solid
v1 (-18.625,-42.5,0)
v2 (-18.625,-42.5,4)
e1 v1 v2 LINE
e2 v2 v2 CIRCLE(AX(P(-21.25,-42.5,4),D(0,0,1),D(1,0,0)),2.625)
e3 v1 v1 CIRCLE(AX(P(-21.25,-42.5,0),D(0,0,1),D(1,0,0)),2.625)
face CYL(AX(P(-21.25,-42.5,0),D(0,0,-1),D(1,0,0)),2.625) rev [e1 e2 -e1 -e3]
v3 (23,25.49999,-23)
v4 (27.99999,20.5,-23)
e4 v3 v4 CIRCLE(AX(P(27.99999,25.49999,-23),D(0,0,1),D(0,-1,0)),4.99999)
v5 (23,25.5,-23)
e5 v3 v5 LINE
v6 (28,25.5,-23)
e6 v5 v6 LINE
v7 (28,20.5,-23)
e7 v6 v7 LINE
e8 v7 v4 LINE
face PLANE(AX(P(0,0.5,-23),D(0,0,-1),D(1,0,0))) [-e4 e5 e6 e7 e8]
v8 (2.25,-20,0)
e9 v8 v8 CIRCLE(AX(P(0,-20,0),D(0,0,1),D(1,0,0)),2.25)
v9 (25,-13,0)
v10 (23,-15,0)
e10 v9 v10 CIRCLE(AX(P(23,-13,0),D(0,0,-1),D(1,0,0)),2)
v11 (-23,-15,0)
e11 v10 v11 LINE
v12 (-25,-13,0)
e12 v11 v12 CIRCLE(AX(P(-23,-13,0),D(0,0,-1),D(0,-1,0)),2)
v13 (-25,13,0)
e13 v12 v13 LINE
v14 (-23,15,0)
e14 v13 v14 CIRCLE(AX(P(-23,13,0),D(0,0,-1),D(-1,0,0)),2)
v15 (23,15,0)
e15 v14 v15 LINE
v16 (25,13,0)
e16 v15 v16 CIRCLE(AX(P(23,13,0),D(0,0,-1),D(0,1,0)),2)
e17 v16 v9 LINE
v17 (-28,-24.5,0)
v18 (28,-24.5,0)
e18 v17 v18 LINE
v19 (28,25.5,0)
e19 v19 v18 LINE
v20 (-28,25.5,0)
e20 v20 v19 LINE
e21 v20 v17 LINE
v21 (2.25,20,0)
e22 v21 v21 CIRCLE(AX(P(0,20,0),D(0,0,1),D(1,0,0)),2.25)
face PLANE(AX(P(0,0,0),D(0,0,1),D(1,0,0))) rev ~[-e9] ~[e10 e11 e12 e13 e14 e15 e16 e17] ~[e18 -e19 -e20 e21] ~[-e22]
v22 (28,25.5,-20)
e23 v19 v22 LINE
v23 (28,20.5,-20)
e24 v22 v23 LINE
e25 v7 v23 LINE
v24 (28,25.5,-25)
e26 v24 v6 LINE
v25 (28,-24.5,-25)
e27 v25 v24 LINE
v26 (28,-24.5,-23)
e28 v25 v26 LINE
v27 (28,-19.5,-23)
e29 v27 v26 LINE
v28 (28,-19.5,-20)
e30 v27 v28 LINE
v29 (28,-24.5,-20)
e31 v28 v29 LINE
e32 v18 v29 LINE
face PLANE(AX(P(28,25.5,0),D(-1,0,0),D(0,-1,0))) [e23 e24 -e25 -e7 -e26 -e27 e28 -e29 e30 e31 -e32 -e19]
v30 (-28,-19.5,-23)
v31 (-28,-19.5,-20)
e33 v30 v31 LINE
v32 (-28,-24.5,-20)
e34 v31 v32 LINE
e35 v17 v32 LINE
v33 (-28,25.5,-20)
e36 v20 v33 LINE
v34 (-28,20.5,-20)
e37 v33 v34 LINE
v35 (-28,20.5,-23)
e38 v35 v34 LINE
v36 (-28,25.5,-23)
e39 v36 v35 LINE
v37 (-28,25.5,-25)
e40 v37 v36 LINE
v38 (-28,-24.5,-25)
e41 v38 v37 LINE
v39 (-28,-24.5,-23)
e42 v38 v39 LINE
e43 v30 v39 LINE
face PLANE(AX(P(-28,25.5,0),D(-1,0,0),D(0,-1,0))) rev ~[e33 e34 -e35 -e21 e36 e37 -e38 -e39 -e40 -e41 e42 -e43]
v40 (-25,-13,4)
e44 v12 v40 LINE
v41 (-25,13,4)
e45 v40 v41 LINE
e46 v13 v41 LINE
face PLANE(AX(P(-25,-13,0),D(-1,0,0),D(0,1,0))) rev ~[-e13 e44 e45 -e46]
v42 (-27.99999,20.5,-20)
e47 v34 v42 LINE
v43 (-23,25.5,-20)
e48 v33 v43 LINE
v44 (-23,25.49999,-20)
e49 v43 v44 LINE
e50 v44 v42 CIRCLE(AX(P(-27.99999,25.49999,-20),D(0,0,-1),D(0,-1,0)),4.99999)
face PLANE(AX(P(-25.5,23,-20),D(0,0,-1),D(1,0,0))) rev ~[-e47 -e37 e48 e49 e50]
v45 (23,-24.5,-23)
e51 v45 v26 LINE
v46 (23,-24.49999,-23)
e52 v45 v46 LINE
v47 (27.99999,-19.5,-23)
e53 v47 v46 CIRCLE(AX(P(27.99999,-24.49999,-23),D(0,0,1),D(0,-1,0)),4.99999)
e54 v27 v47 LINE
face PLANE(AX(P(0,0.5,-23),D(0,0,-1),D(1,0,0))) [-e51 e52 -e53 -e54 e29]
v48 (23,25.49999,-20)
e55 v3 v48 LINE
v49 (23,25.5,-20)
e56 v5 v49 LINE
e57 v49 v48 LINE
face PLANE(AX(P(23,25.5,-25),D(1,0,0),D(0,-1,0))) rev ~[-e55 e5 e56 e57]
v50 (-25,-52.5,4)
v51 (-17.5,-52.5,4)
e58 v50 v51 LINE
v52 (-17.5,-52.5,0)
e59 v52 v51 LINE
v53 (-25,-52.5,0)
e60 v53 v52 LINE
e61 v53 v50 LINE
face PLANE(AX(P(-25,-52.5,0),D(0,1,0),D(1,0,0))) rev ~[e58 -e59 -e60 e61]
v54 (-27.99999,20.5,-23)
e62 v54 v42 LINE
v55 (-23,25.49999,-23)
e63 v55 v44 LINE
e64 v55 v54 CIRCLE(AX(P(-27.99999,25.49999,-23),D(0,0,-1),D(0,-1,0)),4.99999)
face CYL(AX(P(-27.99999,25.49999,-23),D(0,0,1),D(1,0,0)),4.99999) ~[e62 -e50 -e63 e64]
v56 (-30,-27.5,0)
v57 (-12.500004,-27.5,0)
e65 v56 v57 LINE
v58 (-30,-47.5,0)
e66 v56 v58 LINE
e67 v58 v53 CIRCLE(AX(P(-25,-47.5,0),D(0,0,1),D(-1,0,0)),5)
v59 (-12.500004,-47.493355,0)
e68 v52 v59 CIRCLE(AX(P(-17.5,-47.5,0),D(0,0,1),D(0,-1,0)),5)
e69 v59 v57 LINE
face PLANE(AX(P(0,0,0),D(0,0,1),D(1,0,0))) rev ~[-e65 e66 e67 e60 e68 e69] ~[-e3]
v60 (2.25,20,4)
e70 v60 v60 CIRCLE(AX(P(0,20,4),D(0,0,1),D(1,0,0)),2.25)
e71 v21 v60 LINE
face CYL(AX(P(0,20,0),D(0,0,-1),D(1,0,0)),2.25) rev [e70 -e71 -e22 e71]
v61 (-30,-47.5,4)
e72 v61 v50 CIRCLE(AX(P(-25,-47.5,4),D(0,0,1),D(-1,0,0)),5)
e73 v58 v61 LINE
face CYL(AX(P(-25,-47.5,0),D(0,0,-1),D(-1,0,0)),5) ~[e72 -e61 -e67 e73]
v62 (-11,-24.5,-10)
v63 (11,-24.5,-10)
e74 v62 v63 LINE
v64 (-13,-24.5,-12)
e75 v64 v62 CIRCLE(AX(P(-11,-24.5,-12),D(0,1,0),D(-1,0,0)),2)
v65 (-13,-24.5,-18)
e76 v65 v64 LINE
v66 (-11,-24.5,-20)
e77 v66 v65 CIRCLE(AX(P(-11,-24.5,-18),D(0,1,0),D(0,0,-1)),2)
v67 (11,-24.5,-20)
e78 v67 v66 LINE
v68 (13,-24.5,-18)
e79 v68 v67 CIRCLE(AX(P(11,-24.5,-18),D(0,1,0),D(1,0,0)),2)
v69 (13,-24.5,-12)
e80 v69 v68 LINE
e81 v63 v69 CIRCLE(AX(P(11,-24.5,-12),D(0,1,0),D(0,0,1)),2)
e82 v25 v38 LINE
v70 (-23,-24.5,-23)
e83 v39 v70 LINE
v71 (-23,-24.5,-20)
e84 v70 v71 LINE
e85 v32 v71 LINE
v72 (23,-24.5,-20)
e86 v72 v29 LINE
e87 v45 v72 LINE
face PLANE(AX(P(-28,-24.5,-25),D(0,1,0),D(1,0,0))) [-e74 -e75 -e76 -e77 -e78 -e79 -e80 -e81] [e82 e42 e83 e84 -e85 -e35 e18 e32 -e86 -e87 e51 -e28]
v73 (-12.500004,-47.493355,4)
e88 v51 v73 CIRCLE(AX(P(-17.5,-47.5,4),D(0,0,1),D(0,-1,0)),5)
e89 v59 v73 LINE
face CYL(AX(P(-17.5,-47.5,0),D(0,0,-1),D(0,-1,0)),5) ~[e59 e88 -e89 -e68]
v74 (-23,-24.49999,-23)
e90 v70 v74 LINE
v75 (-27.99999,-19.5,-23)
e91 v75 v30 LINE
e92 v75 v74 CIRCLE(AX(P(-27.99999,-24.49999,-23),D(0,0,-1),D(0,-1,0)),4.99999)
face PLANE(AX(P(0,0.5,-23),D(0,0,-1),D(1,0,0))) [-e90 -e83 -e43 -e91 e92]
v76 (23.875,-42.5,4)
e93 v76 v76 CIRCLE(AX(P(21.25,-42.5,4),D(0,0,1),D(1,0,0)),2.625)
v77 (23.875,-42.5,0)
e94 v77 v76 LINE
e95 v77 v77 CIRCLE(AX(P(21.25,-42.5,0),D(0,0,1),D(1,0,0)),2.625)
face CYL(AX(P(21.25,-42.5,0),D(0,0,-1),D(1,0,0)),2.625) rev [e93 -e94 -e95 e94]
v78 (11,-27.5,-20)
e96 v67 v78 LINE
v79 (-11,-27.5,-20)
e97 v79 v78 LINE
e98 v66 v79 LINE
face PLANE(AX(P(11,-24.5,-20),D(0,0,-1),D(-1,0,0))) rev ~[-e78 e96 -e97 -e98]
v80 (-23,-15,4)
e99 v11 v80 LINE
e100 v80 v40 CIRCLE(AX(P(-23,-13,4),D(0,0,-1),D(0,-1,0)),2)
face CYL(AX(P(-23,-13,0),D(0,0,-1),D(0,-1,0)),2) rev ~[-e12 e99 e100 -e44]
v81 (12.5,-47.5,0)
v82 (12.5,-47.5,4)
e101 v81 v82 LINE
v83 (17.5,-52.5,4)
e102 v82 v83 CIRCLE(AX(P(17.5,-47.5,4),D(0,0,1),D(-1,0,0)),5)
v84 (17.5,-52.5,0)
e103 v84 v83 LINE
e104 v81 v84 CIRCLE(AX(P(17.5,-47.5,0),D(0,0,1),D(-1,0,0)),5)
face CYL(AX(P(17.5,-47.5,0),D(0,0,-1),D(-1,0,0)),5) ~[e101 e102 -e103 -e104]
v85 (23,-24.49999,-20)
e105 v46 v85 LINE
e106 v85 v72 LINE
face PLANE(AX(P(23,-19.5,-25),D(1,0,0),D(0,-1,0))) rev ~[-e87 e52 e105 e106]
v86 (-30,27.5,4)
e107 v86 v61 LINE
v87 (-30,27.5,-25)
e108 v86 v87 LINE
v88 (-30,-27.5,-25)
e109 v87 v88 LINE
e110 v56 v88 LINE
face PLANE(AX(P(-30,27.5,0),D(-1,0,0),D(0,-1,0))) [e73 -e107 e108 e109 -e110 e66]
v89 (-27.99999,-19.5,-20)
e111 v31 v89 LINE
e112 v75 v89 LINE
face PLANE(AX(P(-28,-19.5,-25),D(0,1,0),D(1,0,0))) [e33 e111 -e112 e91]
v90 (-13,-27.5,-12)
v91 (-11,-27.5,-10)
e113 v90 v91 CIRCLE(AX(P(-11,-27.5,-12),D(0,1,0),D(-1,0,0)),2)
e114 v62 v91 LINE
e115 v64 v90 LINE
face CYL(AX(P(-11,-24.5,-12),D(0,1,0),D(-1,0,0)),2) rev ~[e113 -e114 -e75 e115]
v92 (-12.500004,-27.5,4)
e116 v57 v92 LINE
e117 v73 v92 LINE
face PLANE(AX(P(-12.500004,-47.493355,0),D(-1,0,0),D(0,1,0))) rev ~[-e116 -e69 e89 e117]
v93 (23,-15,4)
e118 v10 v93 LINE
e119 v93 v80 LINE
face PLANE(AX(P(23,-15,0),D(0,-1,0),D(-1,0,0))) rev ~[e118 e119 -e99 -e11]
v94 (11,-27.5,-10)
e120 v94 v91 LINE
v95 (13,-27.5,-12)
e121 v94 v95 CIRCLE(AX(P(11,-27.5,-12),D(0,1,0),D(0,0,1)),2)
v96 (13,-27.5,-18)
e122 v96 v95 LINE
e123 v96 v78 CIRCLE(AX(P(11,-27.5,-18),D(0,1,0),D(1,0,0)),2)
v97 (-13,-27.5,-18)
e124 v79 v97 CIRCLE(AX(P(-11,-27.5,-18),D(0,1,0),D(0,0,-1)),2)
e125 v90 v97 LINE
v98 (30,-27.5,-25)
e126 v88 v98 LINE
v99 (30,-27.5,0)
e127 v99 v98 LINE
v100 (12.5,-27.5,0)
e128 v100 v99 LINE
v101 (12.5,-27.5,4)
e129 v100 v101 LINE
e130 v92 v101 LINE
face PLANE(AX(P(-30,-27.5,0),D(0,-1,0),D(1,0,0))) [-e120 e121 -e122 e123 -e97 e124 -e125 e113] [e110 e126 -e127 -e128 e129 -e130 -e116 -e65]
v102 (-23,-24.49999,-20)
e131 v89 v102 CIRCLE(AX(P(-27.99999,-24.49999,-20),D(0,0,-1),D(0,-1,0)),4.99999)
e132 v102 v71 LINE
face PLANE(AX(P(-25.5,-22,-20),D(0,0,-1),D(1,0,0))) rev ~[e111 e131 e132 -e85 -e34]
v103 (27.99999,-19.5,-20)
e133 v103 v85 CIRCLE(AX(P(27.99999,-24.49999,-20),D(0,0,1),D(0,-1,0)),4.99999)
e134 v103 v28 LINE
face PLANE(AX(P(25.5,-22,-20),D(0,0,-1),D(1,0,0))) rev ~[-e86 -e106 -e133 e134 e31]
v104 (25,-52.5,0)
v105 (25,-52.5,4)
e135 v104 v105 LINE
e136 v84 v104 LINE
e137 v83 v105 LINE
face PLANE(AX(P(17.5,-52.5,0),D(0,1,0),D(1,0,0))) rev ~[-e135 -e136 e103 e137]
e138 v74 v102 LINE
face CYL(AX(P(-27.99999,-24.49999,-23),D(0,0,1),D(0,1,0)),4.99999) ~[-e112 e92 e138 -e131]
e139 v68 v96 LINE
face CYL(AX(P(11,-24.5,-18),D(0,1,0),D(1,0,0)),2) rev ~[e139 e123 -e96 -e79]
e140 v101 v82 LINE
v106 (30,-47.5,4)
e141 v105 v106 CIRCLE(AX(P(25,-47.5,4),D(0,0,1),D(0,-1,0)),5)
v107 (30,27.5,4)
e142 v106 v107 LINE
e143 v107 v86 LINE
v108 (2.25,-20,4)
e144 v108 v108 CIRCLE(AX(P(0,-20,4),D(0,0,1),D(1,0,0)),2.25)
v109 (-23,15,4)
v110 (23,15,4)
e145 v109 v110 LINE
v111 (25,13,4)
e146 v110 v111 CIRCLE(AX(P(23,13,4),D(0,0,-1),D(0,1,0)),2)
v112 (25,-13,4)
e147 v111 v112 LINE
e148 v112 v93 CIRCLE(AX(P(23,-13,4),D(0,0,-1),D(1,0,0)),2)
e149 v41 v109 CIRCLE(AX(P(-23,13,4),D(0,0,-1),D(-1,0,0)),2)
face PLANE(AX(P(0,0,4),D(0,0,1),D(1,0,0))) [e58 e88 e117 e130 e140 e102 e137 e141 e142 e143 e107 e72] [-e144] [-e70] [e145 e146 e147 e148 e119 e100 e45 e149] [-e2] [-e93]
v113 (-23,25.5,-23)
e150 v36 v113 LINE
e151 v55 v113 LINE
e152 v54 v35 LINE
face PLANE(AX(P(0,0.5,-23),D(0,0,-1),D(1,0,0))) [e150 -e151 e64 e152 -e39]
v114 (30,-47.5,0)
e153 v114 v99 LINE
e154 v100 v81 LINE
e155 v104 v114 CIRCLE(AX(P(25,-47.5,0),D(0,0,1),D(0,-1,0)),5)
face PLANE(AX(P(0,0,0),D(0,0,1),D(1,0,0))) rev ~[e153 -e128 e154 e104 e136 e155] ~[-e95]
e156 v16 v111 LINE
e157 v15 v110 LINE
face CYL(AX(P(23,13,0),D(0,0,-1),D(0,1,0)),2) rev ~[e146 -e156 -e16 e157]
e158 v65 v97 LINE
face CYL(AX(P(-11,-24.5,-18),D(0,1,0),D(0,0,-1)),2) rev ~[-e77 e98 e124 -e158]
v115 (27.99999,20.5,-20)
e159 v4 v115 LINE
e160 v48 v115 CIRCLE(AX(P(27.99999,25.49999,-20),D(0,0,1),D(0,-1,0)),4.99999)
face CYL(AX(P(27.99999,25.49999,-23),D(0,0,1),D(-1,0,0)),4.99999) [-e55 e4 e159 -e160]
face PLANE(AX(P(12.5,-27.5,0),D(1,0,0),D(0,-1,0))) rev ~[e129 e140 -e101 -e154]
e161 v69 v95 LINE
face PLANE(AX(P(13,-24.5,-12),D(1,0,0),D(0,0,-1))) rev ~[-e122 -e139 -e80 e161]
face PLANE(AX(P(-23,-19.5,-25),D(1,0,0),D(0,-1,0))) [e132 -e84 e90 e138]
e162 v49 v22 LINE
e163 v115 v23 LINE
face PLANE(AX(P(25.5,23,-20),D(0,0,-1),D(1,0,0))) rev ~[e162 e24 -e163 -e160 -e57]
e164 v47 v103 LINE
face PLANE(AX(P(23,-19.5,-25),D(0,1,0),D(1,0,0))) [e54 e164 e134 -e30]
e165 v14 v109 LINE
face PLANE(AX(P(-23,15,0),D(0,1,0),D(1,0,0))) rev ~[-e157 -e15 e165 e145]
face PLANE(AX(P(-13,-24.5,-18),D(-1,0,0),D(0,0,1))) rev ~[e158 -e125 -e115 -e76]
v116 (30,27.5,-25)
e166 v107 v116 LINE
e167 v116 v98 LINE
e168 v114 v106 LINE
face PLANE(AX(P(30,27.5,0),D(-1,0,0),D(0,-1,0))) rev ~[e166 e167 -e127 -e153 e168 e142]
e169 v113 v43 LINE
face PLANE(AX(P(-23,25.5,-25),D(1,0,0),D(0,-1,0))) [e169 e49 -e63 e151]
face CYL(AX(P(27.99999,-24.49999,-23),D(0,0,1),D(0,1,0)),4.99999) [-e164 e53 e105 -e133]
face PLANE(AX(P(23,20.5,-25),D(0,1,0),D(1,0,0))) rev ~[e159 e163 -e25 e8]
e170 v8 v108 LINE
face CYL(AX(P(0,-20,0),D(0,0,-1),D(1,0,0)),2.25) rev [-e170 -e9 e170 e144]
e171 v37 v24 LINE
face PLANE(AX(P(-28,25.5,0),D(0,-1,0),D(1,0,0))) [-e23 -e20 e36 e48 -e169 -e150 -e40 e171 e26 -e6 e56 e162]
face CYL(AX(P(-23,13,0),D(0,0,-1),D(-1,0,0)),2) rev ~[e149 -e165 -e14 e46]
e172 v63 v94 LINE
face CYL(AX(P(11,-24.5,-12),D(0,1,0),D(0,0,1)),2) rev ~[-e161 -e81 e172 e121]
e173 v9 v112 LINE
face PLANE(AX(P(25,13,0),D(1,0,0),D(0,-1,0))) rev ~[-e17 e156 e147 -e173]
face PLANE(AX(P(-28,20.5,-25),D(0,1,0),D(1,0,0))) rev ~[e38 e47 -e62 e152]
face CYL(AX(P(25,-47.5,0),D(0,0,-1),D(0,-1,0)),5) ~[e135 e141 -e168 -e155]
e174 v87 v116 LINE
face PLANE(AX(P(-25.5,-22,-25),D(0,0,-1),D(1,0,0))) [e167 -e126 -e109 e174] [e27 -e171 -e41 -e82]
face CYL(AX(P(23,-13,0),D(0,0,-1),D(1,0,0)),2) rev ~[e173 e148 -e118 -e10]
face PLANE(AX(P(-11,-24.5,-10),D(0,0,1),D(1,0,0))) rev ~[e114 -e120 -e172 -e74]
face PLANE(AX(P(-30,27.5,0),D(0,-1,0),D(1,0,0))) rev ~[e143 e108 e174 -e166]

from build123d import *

# Parameters (mm, degrees)
F0_R     = 2.25
F0_R_2   = 2.625
F1_DEPTH = 4
F2_W     = 60
F2_H     = 55
F2_W_2   = 56
F2_H_2   = 50
F3_DEPTH = 25
F5_DEPTH = 25
F6_W     = 5
F6_H     = 5
F7_DEPTH = 5
F8_W     = 56
F8_H     = 50
F9_DEPTH = 2
F10_R    = 4.99999


# Not quite as in the source:
# - a fillet or chamfer is up to 0.001 mm smaller than in the source, because OpenCascade refuses the exact size


with BuildPart() as f1:
    # F0 (on Top) → F1 (new body)
    with BuildSketch(Plane.XY):
        Polygon((30, 27.5), (-30, 27.5), (-30, -27.5), (-12.5000044162, -27.5), (12.5, -27.5), (30, -27.5), align=None)
        with Locations((0, -20)):
            Circle(F0_R, mode=Mode.SUBTRACT)
        with BuildLine():
            ThreePointArc((-25, 13), (-24.4142135624, 14.4142135624), (-23, 15))
            Line((-23, 15), (23, 15))
            ThreePointArc((23, 15), (24.4142135624, 14.4142135624), (25, 13))
            Line((25, 13), (25, -13))
            ThreePointArc((25, -13), (24.4142135624, -14.4142135624), (23, -15))
            Line((23, -15), (-23, -15))
            ThreePointArc((-23, -15), (-24.4142135624, -14.4142135624), (-25, -13))
            Line((-25, -13), (-25, 13))
        make_face(mode=Mode.SUBTRACT)
        with Locations((0, 20)):
            Circle(F0_R, mode=Mode.SUBTRACT)
        with BuildLine():
            Line((-12.5000044162, -27.5), (-30, -27.5))
            Line((-30, -27.5), (-30, -47.5))
            ThreePointArc((-30, -47.5), (-28.5355339059, -51.0355339059), (-25, -52.5))
            Line((-25, -52.5), (-17.5, -52.5))
            ThreePointArc((-17.5, -52.5), (-13.9621173589, -51.0331836094), (-12.5000044162, -47.4933545672))
            Line((-12.5000044162, -47.4933545672), (-12.5000044162, -27.5))
        make_face()
        with Locations((-21.25, -42.5)):
            Circle(F0_R_2, mode=Mode.SUBTRACT)
        with BuildLine():
            Line((30, -47.5), (30, -27.5))
            Line((30, -27.5), (12.5, -27.5))
            Line((12.5, -27.5), (12.5, -47.5))
            ThreePointArc((12.5, -47.5), (13.9644660941, -51.0355339059), (17.5, -52.5))
            Line((17.5, -52.5), (25, -52.5))
            ThreePointArc((25, -52.5), (28.5355339059, -51.0355339059), (30, -47.5))
        make_face()
        with Locations((21.25, -42.5)):
            Circle(F0_R_2, mode=Mode.SUBTRACT)
    extrude(amount=F1_DEPTH)

    # F2 (on face) → F3 (join)
    with BuildSketch(Plane(origin=(0, 0, 0), x_dir=(1, 0, 0), z_dir=(0, 0, -1))):
        Rectangle(F2_W, F2_H)
        with Locations((0, -0.5)):
            Rectangle(F2_W_2, F2_H_2, mode=Mode.SUBTRACT)
    extrude(amount=F3_DEPTH)

    # F4 (on face) → F5 (cut)
    with BuildSketch(Plane(origin=(0, -24.5, 0), x_dir=(-1, 0, 0), z_dir=(0, 1, 0))):
        with BuildLine():
            Line((11, -10), (-11, -10))
            ThreePointArc((-11, -10), (-12.4142135624, -10.5857864376), (-13, -12))
            Line((-13, -12), (-13, -18))
            ThreePointArc((-13, -18), (-12.4142135624, -19.4142135624), (-11, -20))
            Line((-11, -20), (11, -20))
            ThreePointArc((11, -20), (12.4142135624, -19.4142135624), (13, -18))
            Line((13, -18), (13, -12))
            ThreePointArc((13, -12), (12.4142135624, -10.5857864376), (11, -10))
        make_face()
    extrude(amount=-F5_DEPTH, mode=Mode.SUBTRACT)

    # F6 (on face) → F7 (join)
    with BuildSketch(Plane(origin=(0, 0, -25), x_dir=(1, 0, 0), z_dir=(0, 0, -1))):
        with Locations((-25.5, 22)):
            Rectangle(F6_W, F6_H)
        with Locations((25.5, 22)):
            Rectangle(F6_W, F6_H)
        with Locations((25.5, -23)):
            Rectangle(F6_W, F6_H)
        with Locations((-25.5, -23)):
            Rectangle(F6_W, F6_H)
    extrude(amount=-F7_DEPTH)

    # F8 (on face) → F9 (cut)
    with BuildSketch(Plane(origin=(0, 0, -25), x_dir=(1, 0, 0), z_dir=(0, 0, -1))):
        with Locations((0, -0.5)):
            Rectangle(F8_W, F8_H)
    extrude(amount=-F9_DEPTH, mode=Mode.SUBTRACT)

    # F10 (radius 5 in the source; OpenCascade refuses exactly that, so slightly less here)
    f10_edges = [f1.edges().sort_by_distance(p)[0] for p in [
        (-23, -19.5, -21.5),
        (23, -19.5, -21.5),
        (23, 20.5, -21.5),
        (-23, 20.5, -21.5),
    ]]
    fillet(f10_edges, radius=F10_R)


solid = f1.part
